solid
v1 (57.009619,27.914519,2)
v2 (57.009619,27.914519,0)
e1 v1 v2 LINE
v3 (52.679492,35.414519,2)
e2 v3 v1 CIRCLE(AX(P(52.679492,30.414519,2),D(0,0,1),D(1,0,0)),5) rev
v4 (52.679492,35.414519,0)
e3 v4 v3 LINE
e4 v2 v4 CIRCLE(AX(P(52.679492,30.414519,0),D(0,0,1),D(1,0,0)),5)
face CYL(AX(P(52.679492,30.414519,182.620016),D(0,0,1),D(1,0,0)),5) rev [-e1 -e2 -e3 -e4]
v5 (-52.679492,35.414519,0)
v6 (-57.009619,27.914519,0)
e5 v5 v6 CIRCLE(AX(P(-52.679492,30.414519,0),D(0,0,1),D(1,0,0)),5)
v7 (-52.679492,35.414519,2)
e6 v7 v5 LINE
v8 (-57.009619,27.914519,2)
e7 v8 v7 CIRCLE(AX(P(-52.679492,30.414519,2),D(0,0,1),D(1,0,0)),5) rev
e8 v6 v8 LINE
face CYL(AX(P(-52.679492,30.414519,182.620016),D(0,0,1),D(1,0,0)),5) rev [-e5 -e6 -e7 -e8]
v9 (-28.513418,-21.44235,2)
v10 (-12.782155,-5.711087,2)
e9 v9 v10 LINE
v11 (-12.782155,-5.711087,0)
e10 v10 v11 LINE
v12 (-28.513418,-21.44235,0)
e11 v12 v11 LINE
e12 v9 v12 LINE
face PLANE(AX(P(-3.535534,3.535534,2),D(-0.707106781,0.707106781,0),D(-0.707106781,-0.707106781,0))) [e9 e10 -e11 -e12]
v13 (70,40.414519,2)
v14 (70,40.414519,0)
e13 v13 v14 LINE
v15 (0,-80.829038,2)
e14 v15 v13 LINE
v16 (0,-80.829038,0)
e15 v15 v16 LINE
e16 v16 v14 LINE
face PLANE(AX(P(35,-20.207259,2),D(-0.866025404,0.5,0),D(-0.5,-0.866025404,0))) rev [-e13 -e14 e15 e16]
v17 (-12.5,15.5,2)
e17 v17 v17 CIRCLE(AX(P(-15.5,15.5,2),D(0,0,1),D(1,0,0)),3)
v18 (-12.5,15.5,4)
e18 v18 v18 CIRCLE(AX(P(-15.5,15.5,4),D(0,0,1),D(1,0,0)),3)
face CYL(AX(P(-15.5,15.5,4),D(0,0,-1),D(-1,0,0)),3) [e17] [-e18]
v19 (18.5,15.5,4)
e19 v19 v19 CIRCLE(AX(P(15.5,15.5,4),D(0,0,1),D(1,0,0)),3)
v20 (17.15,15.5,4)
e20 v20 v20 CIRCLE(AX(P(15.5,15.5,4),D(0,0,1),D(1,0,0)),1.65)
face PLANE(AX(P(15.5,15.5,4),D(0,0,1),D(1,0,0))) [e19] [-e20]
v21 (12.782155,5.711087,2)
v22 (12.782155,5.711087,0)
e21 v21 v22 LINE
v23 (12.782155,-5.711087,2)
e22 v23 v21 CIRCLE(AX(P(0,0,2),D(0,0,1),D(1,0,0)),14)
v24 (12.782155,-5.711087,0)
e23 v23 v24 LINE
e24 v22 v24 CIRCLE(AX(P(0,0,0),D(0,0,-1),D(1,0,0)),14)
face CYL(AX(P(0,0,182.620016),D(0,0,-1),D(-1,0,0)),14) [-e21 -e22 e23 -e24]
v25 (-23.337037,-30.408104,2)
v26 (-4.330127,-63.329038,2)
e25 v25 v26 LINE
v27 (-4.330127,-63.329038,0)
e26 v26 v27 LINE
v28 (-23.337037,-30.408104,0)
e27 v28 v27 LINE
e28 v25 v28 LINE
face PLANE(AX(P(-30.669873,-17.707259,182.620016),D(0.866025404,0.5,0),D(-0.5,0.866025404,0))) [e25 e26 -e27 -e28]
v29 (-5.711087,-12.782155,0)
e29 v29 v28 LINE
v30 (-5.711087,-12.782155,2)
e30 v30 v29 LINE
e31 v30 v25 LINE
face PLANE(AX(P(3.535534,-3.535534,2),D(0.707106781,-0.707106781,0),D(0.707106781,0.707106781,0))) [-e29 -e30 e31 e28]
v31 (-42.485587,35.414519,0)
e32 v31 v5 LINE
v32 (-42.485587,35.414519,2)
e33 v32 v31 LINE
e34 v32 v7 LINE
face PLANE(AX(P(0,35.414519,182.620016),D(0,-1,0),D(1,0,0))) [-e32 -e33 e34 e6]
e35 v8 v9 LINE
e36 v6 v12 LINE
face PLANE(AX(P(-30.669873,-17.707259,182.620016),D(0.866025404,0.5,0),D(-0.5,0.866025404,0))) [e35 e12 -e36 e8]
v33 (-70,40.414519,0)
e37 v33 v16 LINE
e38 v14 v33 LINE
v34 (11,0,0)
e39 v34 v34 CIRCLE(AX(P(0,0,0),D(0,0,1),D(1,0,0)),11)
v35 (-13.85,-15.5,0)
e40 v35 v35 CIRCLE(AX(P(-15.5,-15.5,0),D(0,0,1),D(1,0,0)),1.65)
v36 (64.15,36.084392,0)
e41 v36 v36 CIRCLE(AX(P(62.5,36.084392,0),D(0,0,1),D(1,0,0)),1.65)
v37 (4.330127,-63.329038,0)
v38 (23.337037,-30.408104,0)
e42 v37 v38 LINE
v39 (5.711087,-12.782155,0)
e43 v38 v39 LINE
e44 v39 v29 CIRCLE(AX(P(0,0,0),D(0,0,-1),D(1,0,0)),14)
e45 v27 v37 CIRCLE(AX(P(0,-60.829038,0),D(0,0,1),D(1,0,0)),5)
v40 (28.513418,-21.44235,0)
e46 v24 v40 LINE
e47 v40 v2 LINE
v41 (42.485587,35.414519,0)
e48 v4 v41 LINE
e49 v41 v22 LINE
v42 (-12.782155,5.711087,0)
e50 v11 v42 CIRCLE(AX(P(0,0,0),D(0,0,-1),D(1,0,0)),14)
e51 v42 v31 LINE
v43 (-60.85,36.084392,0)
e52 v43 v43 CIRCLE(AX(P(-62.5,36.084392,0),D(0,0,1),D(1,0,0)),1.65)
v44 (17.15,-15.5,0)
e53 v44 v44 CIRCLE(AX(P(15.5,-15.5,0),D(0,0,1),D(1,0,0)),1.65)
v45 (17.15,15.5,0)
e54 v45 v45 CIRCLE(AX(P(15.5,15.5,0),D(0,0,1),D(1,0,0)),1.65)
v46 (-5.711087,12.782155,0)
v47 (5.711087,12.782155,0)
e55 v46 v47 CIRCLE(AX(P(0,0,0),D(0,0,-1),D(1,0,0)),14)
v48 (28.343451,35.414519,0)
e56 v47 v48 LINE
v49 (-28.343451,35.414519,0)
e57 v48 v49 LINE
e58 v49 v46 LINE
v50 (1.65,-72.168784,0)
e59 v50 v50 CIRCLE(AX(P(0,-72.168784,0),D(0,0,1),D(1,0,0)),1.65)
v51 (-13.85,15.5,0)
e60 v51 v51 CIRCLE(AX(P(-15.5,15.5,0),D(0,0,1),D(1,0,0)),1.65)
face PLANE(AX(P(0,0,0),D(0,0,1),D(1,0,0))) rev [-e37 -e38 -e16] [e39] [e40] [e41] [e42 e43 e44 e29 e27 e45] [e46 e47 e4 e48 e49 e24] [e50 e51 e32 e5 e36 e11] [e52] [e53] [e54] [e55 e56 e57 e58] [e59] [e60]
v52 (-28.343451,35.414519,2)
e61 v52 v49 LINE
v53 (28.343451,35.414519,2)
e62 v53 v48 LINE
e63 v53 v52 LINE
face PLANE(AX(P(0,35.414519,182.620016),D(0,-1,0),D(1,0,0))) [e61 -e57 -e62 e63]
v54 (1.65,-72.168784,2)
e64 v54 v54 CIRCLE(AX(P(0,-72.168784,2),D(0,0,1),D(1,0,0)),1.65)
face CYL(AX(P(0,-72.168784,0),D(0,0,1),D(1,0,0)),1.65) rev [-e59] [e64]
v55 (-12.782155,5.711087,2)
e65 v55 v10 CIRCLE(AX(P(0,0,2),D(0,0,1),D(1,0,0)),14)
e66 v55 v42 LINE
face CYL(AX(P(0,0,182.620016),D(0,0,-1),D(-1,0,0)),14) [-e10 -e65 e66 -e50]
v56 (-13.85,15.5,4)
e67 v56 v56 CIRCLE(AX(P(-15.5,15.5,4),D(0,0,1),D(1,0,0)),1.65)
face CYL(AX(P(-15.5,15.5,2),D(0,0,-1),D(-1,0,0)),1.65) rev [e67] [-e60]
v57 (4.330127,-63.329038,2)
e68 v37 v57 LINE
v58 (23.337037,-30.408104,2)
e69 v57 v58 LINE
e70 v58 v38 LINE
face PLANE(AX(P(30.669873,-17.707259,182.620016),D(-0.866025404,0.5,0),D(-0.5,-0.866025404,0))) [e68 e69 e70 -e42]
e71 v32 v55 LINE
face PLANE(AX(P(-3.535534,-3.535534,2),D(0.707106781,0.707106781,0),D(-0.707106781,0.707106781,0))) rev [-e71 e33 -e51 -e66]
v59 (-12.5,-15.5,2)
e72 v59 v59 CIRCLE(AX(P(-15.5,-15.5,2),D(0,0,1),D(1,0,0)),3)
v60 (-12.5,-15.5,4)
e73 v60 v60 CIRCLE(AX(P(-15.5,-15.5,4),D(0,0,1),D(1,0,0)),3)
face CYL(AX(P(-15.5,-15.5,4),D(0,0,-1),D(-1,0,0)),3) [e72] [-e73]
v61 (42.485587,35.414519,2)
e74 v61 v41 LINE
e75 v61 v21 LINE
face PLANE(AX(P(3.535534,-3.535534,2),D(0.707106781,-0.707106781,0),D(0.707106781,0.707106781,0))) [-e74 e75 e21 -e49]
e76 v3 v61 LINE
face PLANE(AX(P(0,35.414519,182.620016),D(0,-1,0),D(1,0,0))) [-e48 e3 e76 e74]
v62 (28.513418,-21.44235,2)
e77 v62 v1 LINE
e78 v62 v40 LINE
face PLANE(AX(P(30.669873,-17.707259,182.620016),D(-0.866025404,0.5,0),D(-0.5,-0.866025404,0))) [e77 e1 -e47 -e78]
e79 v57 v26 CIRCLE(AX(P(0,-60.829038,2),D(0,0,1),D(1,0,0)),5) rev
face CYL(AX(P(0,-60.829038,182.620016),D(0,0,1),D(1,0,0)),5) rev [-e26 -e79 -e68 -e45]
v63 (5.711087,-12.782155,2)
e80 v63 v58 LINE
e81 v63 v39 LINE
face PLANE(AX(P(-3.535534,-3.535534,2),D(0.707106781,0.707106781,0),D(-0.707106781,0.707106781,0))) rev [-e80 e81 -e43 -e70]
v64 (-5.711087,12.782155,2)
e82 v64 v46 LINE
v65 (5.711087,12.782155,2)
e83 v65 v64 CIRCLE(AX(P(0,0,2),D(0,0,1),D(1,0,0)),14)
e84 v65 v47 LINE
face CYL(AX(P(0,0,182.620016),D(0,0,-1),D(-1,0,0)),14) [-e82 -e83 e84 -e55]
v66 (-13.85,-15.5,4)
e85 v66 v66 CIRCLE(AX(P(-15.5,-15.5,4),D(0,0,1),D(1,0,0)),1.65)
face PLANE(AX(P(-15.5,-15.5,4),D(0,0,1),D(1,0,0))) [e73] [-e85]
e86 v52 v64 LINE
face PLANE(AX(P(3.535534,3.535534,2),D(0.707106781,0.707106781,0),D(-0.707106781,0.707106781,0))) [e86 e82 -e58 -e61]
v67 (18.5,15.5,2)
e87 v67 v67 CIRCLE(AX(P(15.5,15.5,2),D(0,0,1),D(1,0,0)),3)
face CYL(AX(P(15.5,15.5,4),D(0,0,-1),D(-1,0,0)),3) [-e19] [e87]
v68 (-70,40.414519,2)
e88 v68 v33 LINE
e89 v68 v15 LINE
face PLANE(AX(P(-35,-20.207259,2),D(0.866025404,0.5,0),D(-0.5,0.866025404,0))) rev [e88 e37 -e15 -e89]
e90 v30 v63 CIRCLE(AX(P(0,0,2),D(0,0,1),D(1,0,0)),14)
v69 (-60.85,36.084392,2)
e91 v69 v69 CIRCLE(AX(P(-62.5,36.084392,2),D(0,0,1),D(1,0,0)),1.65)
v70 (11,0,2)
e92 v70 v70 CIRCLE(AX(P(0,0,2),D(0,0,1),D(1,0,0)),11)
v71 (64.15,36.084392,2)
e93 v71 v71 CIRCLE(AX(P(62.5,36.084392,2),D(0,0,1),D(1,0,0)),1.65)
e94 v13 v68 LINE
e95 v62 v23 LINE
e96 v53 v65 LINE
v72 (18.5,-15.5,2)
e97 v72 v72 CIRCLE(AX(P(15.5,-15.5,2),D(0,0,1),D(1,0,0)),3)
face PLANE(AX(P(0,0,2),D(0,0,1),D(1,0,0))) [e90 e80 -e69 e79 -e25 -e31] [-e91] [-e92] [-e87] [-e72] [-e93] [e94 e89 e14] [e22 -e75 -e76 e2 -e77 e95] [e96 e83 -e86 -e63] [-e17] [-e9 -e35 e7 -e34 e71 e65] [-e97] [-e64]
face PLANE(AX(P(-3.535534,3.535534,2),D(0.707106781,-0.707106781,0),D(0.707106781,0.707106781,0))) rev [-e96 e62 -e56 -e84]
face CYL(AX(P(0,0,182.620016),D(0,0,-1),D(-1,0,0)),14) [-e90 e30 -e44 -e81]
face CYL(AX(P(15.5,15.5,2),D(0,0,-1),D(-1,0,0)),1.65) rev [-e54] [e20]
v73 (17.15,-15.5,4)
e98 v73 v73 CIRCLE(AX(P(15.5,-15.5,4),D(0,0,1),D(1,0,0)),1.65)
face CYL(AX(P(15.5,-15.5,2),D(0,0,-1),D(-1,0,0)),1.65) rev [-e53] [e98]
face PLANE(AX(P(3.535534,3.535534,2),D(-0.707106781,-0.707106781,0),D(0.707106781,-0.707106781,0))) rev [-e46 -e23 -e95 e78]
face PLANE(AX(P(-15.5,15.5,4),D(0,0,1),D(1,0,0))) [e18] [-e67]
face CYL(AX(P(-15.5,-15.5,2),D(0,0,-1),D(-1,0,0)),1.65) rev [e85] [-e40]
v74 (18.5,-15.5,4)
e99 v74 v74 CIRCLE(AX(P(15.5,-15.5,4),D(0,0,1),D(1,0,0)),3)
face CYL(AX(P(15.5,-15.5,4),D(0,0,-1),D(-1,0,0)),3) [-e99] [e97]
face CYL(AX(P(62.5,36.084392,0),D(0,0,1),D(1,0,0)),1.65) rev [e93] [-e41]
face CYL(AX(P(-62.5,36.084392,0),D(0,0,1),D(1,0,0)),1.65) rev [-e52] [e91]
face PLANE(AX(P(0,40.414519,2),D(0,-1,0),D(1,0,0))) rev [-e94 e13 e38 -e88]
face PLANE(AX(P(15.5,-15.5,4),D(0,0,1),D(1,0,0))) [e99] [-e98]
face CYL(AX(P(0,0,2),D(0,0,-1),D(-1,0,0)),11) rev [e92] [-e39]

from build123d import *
from build123d.topology import SkipClean

# Parameters (mm, degrees)
SKETCH1_R               = 1.65
SKETCH1_R_2             = 11
BOSS_EXTRUDE1_DEPTH     = 2
SHELL2_T                = -1
SKETCH3_R               = 4.65
SKETCH3_R_2             = 2.65
SKETCH3_R_3             = 14
SKETCH3_R_4             = 12
BOSS_EXTRUDE2_DEPTH     = 1
SKETCH4_R               = 4.65
BOSS_EXTRUDE3_DEPTH     = 1
CUT_EXTRUDE2_DEPTH      = 107.931442211
CUT_EXTRUDE2_DEPTH_BACK = 107.931442211
FILLET2_DEPTH           = 2
SKETCH7_R               = 1.65
CUT_EXTRUDE3_DEPTH      = 107.945468971
SKETCH8_R               = 3
SKETCH8_R_2             = 1.65
BOSS_EXTRUDE4_DEPTH     = 2


with BuildPart() as part:
    # Sketch1 → Boss-Extrude1 (new body)
    with BuildSketch(Plane.XY):
        Polygon((70, 40.414518843), (-70, 40.414518843), (0, -80.829037687), align=None)
        with Locations((-15.5, -15.5)):
            Circle(SKETCH1_R, mode=Mode.SUBTRACT)
        with Locations((15.5, -15.5)):
            Circle(SKETCH1_R, mode=Mode.SUBTRACT)
        with Locations((15.5, 15.5)):
            Circle(SKETCH1_R, mode=Mode.SUBTRACT)
        with Locations((-15.5, 15.5)):
            Circle(SKETCH1_R, mode=Mode.SUBTRACT)
        Circle(SKETCH1_R_2, mode=Mode.SUBTRACT)
    extrude(amount=BOSS_EXTRUDE1_DEPTH)

    # Shell2
    shell2_openings = [part.faces().sort_by_distance(p)[0] for p in [
        (0, 38.562492926, 2),
    ]]
    offset(amount=SHELL2_T, openings=shell2_openings, kind=Kind.INTERSECTION)

    # Sketch3 → Boss-Extrude2 (add)
    # profile 1 of 6: a face of its own
    with BuildSketch(Plane.XY.offset(1)):
        Polygon((68.267949192, 39.414518843), (-68.267949192, 39.414518843), (0, -78.829037687), align=None)
        Polygon((61.339745962, 35.414518843), (-61.339745962, 35.414518843), (0, -70.829037687), align=None, mode=Mode.SUBTRACT)
    # profile 2 of 6: a face of its own
    with BuildSketch(Plane.XY.offset(1)):
        with Locations((-15.5, -15.5)):
            Circle(SKETCH3_R)
        with Locations((-15.5, -15.5)):
            Circle(SKETCH3_R_2, mode=Mode.SUBTRACT)
    # profile 3 of 6: a face of its own
    with BuildSketch(Plane.XY.offset(1)):
        with Locations((15.5, -15.5)):
            Circle(SKETCH3_R)
        with Locations((15.5, -15.5)):
            Circle(SKETCH3_R_2, mode=Mode.SUBTRACT)
    # profile 4 of 6: a face of its own
    with BuildSketch(Plane.XY.offset(1)):
        Circle(SKETCH3_R_3)
        Circle(SKETCH3_R_4, mode=Mode.SUBTRACT)
    # profile 5 of 6: a face of its own
    with BuildSketch(Plane.XY.offset(1)):
        with Locations((15.5, 15.5)):
            Circle(SKETCH3_R)
        with Locations((15.5, 15.5)):
            Circle(SKETCH3_R_2, mode=Mode.SUBTRACT)
    # profile 6 of 6: a face of its own
    with BuildSketch(Plane.XY.offset(1)):
        with Locations((-15.5, 15.5)):
            Circle(SKETCH3_R)
        with Locations((-15.5, 15.5)):
            Circle(SKETCH3_R_2, mode=Mode.SUBTRACT)
    extrude(amount=BOSS_EXTRUDE2_DEPTH)

    # Sketch4 → Boss-Extrude3 (add)
    # profile 1 of 4: a face of its own
    with BuildSketch(Plane.XY.offset(1)):
        with BuildLine():
            Line((-23.337036668, -30.40810448), (-5.711087099, -12.78215491))
            ThreePointArc((-5.711087099, -12.78215491), (-9.899494937, -9.899494937), (-12.78215491, -5.711087099))
            Line((-12.78215491, -5.711087099), (-28.51341757, -21.442349758))
            Line((-28.51341757, -21.442349758), (-23.337036668, -30.40810448))
        make_face()
        with Locations((-15.5, -15.5)):
            Circle(SKETCH4_R, mode=Mode.SUBTRACT)
    # profile 2 of 4: a face of its own
    with BuildSketch(Plane.XY.offset(1)):
        with BuildLine():
            ThreePointArc((12.78215491, -5.711087099), (9.899494937, -9.899494937), (5.711087099, -12.78215491))
            Line((5.711087099, -12.78215491), (23.337036668, -30.40810448))
            Line((23.337036668, -30.40810448), (28.51341757, -21.442349758))
            Line((28.51341757, -21.442349758), (12.78215491, -5.711087099))
        make_face()
        with Locations((15.5, -15.5)):
            Circle(SKETCH4_R, mode=Mode.SUBTRACT)
    # profile 3 of 4: a face of its own
    with BuildSketch(Plane.XY.offset(1)):
        with BuildLine():
            ThreePointArc((5.711087099, 12.78215491), (9.899494937, 9.899494937), (12.78215491, 5.711087099))
            Line((12.78215491, 5.711087099), (42.485586655, 35.414518843))
            Line((42.485586655, 35.414518843), (28.343451031, 35.414518843))
            Line((28.343451031, 35.414518843), (5.711087099, 12.78215491))
        make_face()
        with Locations((15.5, 15.5)):
            Circle(SKETCH4_R, mode=Mode.SUBTRACT)
    # profile 4 of 4: a face of its own
    with BuildSketch(Plane.XY.offset(1)):
        with BuildLine():
            Line((-42.485586655, 35.414518843), (-12.78215491, 5.711087099))
            ThreePointArc((-12.78215491, 5.711087099), (-9.899494937, 9.899494937), (-5.711087099, 12.78215491))
            Line((-5.711087099, 12.78215491), (-28.343451031, 35.414518843))
            Line((-28.343451031, 35.414518843), (-42.485586655, 35.414518843))
        make_face()
        with Locations((-15.5, 15.5)):
            Circle(SKETCH4_R, mode=Mode.SUBTRACT)
    extrude(amount=BOSS_EXTRUDE3_DEPTH)

    # Sketch6 → Cut-Extrude2 (cut, two sides: drawn at the far end of the back side and taken through both)
    with BuildSketch(Plane.XY.offset(1).offset(-CUT_EXTRUDE2_DEPTH_BACK)):
        with BuildLine():
            Line((-12.78215491, 5.711087099), (-42.485586655, 35.414518843))
            Line((-42.485586655, 35.414518843), (-61.339745962, 35.414518843))
            Line((-61.339745962, 35.414518843), (-28.51341757, -21.442349758))
            Line((-28.51341757, -21.442349758), (-12.78215491, -5.711087099))
            ThreePointArc((-12.78215491, -5.711087099), (-14, 0), (-12.78215491, 5.711087099))
        make_face()
        with BuildLine():
            Line((0, -70.829037687), (23.337036668, -30.40810448))
            Line((23.337036668, -30.40810448), (5.711087099, -12.78215491))
            ThreePointArc((5.711087099, -12.78215491), (0, -14), (-5.711087099, -12.78215491))
            Line((-5.711087099, -12.78215491), (-23.337036668, -30.40810448))
            Line((-23.337036668, -30.40810448), (0, -70.829037687))
        make_face()
        with BuildLine():
            Line((42.485586655, 35.414518843), (12.78215491, 5.711087099))
            ThreePointArc((12.78215491, 5.711087099), (14, 0), (12.78215491, -5.711087099))
            Line((12.78215491, -5.711087099), (28.51341757, -21.442349758))
            Line((28.51341757, -21.442349758), (61.339745962, 35.414518843))
            Line((61.339745962, 35.414518843), (42.485586655, 35.414518843))
        make_face()
        with BuildLine():
            Line((-28.343451031, 35.414518843), (-5.711087099, 12.78215491))
            ThreePointArc((-5.711087099, 12.78215491), (0, 14), (5.711087099, 12.78215491))
            Line((5.711087099, 12.78215491), (28.343451031, 35.414518843))
            Line((28.343451031, 35.414518843), (-28.343451031, 35.414518843))
        make_face()
    extrude(amount=CUT_EXTRUDE2_DEPTH + CUT_EXTRUDE2_DEPTH_BACK, mode=Mode.SUBTRACT)

    # Fillet2: read off the stored shape, not the designer's step
    # Fillet2 outline → Fillet2 (add)
    with SkipClean():  # the faces are left unmerged after this step: merging them gives an invalid solid
        with BuildSketch(Plane.XY):
            with BuildLine():
                ThreePointArc((4.330127019, -63.329037687), (0, -65.829037687), (-4.330127019, -63.329037687))
                Line((-4.330127019, -63.329037687), (0, -70.829037687))
                Line((0, -70.829037687), (4.330127019, -63.329037687))
            make_face()
            with BuildLine():
                ThreePointArc((52.679491924, 35.414518843), (57.009618943, 32.914518843), (57.009618943, 27.914518843))
                Line((57.009618943, 27.914518843), (61.339745962, 35.414518843))
                Line((61.339745962, 35.414518843), (52.679491924, 35.414518843))
            make_face()
            with BuildLine():
                ThreePointArc((-57.009618943, 27.914518843), (-57.009618943, 32.914518843), (-52.679491924, 35.414518843))
                Line((-52.679491924, 35.414518843), (-61.339745962, 35.414518843))
                Line((-61.339745962, 35.414518843), (-57.009618943, 27.914518843))
            make_face()
        extrude(amount=FILLET2_DEPTH)
    add(part.part.scale(1), mode=Mode.REPLACE)  # the faces are merged on a copy

    # Sketch7 → Cut-Extrude3 (cut, through all)
    with BuildSketch(Plane.XY.offset(2)):
        with Locations((-62.5, 36.084391824)):
            Circle(SKETCH7_R)
        with Locations((62.5, 36.084391824)):
            Circle(SKETCH7_R)
        with Locations((0, -72.168783649)):
            Circle(SKETCH7_R)
    extrude(amount=-CUT_EXTRUDE3_DEPTH, mode=Mode.SUBTRACT)

    # Sketch8 → Boss-Extrude4 (add)
    # profile 1 of 4: a face of its own
    with BuildSketch(Plane.XY.offset(2)):
        with Locations((-15.5, 15.5)):
            Circle(SKETCH8_R)
        with Locations((-15.5, 15.5)):
            Circle(SKETCH8_R_2, mode=Mode.SUBTRACT)
    # profile 2 of 4: a face of its own
    with BuildSketch(Plane.XY.offset(2)):
        with Locations((15.5, 15.5)):
            Circle(SKETCH8_R)
        with Locations((15.5, 15.5)):
            Circle(SKETCH8_R_2, mode=Mode.SUBTRACT)
    # profile 3 of 4: a face of its own
    with BuildSketch(Plane.XY.offset(2)):
        with Locations((15.5, -15.5)):
            Circle(SKETCH8_R)
        with Locations((15.5, -15.5)):
            Circle(SKETCH8_R_2, mode=Mode.SUBTRACT)
    # profile 4 of 4: a face of its own
    with BuildSketch(Plane.XY.offset(2)):
        with Locations((-15.5, -15.5)):
            Circle(SKETCH8_R)
        with Locations((-15.5, -15.5)):
            Circle(SKETCH8_R_2, mode=Mode.SUBTRACT)
    extrude(amount=BOSS_EXTRUDE4_DEPTH)


solid = part.part
